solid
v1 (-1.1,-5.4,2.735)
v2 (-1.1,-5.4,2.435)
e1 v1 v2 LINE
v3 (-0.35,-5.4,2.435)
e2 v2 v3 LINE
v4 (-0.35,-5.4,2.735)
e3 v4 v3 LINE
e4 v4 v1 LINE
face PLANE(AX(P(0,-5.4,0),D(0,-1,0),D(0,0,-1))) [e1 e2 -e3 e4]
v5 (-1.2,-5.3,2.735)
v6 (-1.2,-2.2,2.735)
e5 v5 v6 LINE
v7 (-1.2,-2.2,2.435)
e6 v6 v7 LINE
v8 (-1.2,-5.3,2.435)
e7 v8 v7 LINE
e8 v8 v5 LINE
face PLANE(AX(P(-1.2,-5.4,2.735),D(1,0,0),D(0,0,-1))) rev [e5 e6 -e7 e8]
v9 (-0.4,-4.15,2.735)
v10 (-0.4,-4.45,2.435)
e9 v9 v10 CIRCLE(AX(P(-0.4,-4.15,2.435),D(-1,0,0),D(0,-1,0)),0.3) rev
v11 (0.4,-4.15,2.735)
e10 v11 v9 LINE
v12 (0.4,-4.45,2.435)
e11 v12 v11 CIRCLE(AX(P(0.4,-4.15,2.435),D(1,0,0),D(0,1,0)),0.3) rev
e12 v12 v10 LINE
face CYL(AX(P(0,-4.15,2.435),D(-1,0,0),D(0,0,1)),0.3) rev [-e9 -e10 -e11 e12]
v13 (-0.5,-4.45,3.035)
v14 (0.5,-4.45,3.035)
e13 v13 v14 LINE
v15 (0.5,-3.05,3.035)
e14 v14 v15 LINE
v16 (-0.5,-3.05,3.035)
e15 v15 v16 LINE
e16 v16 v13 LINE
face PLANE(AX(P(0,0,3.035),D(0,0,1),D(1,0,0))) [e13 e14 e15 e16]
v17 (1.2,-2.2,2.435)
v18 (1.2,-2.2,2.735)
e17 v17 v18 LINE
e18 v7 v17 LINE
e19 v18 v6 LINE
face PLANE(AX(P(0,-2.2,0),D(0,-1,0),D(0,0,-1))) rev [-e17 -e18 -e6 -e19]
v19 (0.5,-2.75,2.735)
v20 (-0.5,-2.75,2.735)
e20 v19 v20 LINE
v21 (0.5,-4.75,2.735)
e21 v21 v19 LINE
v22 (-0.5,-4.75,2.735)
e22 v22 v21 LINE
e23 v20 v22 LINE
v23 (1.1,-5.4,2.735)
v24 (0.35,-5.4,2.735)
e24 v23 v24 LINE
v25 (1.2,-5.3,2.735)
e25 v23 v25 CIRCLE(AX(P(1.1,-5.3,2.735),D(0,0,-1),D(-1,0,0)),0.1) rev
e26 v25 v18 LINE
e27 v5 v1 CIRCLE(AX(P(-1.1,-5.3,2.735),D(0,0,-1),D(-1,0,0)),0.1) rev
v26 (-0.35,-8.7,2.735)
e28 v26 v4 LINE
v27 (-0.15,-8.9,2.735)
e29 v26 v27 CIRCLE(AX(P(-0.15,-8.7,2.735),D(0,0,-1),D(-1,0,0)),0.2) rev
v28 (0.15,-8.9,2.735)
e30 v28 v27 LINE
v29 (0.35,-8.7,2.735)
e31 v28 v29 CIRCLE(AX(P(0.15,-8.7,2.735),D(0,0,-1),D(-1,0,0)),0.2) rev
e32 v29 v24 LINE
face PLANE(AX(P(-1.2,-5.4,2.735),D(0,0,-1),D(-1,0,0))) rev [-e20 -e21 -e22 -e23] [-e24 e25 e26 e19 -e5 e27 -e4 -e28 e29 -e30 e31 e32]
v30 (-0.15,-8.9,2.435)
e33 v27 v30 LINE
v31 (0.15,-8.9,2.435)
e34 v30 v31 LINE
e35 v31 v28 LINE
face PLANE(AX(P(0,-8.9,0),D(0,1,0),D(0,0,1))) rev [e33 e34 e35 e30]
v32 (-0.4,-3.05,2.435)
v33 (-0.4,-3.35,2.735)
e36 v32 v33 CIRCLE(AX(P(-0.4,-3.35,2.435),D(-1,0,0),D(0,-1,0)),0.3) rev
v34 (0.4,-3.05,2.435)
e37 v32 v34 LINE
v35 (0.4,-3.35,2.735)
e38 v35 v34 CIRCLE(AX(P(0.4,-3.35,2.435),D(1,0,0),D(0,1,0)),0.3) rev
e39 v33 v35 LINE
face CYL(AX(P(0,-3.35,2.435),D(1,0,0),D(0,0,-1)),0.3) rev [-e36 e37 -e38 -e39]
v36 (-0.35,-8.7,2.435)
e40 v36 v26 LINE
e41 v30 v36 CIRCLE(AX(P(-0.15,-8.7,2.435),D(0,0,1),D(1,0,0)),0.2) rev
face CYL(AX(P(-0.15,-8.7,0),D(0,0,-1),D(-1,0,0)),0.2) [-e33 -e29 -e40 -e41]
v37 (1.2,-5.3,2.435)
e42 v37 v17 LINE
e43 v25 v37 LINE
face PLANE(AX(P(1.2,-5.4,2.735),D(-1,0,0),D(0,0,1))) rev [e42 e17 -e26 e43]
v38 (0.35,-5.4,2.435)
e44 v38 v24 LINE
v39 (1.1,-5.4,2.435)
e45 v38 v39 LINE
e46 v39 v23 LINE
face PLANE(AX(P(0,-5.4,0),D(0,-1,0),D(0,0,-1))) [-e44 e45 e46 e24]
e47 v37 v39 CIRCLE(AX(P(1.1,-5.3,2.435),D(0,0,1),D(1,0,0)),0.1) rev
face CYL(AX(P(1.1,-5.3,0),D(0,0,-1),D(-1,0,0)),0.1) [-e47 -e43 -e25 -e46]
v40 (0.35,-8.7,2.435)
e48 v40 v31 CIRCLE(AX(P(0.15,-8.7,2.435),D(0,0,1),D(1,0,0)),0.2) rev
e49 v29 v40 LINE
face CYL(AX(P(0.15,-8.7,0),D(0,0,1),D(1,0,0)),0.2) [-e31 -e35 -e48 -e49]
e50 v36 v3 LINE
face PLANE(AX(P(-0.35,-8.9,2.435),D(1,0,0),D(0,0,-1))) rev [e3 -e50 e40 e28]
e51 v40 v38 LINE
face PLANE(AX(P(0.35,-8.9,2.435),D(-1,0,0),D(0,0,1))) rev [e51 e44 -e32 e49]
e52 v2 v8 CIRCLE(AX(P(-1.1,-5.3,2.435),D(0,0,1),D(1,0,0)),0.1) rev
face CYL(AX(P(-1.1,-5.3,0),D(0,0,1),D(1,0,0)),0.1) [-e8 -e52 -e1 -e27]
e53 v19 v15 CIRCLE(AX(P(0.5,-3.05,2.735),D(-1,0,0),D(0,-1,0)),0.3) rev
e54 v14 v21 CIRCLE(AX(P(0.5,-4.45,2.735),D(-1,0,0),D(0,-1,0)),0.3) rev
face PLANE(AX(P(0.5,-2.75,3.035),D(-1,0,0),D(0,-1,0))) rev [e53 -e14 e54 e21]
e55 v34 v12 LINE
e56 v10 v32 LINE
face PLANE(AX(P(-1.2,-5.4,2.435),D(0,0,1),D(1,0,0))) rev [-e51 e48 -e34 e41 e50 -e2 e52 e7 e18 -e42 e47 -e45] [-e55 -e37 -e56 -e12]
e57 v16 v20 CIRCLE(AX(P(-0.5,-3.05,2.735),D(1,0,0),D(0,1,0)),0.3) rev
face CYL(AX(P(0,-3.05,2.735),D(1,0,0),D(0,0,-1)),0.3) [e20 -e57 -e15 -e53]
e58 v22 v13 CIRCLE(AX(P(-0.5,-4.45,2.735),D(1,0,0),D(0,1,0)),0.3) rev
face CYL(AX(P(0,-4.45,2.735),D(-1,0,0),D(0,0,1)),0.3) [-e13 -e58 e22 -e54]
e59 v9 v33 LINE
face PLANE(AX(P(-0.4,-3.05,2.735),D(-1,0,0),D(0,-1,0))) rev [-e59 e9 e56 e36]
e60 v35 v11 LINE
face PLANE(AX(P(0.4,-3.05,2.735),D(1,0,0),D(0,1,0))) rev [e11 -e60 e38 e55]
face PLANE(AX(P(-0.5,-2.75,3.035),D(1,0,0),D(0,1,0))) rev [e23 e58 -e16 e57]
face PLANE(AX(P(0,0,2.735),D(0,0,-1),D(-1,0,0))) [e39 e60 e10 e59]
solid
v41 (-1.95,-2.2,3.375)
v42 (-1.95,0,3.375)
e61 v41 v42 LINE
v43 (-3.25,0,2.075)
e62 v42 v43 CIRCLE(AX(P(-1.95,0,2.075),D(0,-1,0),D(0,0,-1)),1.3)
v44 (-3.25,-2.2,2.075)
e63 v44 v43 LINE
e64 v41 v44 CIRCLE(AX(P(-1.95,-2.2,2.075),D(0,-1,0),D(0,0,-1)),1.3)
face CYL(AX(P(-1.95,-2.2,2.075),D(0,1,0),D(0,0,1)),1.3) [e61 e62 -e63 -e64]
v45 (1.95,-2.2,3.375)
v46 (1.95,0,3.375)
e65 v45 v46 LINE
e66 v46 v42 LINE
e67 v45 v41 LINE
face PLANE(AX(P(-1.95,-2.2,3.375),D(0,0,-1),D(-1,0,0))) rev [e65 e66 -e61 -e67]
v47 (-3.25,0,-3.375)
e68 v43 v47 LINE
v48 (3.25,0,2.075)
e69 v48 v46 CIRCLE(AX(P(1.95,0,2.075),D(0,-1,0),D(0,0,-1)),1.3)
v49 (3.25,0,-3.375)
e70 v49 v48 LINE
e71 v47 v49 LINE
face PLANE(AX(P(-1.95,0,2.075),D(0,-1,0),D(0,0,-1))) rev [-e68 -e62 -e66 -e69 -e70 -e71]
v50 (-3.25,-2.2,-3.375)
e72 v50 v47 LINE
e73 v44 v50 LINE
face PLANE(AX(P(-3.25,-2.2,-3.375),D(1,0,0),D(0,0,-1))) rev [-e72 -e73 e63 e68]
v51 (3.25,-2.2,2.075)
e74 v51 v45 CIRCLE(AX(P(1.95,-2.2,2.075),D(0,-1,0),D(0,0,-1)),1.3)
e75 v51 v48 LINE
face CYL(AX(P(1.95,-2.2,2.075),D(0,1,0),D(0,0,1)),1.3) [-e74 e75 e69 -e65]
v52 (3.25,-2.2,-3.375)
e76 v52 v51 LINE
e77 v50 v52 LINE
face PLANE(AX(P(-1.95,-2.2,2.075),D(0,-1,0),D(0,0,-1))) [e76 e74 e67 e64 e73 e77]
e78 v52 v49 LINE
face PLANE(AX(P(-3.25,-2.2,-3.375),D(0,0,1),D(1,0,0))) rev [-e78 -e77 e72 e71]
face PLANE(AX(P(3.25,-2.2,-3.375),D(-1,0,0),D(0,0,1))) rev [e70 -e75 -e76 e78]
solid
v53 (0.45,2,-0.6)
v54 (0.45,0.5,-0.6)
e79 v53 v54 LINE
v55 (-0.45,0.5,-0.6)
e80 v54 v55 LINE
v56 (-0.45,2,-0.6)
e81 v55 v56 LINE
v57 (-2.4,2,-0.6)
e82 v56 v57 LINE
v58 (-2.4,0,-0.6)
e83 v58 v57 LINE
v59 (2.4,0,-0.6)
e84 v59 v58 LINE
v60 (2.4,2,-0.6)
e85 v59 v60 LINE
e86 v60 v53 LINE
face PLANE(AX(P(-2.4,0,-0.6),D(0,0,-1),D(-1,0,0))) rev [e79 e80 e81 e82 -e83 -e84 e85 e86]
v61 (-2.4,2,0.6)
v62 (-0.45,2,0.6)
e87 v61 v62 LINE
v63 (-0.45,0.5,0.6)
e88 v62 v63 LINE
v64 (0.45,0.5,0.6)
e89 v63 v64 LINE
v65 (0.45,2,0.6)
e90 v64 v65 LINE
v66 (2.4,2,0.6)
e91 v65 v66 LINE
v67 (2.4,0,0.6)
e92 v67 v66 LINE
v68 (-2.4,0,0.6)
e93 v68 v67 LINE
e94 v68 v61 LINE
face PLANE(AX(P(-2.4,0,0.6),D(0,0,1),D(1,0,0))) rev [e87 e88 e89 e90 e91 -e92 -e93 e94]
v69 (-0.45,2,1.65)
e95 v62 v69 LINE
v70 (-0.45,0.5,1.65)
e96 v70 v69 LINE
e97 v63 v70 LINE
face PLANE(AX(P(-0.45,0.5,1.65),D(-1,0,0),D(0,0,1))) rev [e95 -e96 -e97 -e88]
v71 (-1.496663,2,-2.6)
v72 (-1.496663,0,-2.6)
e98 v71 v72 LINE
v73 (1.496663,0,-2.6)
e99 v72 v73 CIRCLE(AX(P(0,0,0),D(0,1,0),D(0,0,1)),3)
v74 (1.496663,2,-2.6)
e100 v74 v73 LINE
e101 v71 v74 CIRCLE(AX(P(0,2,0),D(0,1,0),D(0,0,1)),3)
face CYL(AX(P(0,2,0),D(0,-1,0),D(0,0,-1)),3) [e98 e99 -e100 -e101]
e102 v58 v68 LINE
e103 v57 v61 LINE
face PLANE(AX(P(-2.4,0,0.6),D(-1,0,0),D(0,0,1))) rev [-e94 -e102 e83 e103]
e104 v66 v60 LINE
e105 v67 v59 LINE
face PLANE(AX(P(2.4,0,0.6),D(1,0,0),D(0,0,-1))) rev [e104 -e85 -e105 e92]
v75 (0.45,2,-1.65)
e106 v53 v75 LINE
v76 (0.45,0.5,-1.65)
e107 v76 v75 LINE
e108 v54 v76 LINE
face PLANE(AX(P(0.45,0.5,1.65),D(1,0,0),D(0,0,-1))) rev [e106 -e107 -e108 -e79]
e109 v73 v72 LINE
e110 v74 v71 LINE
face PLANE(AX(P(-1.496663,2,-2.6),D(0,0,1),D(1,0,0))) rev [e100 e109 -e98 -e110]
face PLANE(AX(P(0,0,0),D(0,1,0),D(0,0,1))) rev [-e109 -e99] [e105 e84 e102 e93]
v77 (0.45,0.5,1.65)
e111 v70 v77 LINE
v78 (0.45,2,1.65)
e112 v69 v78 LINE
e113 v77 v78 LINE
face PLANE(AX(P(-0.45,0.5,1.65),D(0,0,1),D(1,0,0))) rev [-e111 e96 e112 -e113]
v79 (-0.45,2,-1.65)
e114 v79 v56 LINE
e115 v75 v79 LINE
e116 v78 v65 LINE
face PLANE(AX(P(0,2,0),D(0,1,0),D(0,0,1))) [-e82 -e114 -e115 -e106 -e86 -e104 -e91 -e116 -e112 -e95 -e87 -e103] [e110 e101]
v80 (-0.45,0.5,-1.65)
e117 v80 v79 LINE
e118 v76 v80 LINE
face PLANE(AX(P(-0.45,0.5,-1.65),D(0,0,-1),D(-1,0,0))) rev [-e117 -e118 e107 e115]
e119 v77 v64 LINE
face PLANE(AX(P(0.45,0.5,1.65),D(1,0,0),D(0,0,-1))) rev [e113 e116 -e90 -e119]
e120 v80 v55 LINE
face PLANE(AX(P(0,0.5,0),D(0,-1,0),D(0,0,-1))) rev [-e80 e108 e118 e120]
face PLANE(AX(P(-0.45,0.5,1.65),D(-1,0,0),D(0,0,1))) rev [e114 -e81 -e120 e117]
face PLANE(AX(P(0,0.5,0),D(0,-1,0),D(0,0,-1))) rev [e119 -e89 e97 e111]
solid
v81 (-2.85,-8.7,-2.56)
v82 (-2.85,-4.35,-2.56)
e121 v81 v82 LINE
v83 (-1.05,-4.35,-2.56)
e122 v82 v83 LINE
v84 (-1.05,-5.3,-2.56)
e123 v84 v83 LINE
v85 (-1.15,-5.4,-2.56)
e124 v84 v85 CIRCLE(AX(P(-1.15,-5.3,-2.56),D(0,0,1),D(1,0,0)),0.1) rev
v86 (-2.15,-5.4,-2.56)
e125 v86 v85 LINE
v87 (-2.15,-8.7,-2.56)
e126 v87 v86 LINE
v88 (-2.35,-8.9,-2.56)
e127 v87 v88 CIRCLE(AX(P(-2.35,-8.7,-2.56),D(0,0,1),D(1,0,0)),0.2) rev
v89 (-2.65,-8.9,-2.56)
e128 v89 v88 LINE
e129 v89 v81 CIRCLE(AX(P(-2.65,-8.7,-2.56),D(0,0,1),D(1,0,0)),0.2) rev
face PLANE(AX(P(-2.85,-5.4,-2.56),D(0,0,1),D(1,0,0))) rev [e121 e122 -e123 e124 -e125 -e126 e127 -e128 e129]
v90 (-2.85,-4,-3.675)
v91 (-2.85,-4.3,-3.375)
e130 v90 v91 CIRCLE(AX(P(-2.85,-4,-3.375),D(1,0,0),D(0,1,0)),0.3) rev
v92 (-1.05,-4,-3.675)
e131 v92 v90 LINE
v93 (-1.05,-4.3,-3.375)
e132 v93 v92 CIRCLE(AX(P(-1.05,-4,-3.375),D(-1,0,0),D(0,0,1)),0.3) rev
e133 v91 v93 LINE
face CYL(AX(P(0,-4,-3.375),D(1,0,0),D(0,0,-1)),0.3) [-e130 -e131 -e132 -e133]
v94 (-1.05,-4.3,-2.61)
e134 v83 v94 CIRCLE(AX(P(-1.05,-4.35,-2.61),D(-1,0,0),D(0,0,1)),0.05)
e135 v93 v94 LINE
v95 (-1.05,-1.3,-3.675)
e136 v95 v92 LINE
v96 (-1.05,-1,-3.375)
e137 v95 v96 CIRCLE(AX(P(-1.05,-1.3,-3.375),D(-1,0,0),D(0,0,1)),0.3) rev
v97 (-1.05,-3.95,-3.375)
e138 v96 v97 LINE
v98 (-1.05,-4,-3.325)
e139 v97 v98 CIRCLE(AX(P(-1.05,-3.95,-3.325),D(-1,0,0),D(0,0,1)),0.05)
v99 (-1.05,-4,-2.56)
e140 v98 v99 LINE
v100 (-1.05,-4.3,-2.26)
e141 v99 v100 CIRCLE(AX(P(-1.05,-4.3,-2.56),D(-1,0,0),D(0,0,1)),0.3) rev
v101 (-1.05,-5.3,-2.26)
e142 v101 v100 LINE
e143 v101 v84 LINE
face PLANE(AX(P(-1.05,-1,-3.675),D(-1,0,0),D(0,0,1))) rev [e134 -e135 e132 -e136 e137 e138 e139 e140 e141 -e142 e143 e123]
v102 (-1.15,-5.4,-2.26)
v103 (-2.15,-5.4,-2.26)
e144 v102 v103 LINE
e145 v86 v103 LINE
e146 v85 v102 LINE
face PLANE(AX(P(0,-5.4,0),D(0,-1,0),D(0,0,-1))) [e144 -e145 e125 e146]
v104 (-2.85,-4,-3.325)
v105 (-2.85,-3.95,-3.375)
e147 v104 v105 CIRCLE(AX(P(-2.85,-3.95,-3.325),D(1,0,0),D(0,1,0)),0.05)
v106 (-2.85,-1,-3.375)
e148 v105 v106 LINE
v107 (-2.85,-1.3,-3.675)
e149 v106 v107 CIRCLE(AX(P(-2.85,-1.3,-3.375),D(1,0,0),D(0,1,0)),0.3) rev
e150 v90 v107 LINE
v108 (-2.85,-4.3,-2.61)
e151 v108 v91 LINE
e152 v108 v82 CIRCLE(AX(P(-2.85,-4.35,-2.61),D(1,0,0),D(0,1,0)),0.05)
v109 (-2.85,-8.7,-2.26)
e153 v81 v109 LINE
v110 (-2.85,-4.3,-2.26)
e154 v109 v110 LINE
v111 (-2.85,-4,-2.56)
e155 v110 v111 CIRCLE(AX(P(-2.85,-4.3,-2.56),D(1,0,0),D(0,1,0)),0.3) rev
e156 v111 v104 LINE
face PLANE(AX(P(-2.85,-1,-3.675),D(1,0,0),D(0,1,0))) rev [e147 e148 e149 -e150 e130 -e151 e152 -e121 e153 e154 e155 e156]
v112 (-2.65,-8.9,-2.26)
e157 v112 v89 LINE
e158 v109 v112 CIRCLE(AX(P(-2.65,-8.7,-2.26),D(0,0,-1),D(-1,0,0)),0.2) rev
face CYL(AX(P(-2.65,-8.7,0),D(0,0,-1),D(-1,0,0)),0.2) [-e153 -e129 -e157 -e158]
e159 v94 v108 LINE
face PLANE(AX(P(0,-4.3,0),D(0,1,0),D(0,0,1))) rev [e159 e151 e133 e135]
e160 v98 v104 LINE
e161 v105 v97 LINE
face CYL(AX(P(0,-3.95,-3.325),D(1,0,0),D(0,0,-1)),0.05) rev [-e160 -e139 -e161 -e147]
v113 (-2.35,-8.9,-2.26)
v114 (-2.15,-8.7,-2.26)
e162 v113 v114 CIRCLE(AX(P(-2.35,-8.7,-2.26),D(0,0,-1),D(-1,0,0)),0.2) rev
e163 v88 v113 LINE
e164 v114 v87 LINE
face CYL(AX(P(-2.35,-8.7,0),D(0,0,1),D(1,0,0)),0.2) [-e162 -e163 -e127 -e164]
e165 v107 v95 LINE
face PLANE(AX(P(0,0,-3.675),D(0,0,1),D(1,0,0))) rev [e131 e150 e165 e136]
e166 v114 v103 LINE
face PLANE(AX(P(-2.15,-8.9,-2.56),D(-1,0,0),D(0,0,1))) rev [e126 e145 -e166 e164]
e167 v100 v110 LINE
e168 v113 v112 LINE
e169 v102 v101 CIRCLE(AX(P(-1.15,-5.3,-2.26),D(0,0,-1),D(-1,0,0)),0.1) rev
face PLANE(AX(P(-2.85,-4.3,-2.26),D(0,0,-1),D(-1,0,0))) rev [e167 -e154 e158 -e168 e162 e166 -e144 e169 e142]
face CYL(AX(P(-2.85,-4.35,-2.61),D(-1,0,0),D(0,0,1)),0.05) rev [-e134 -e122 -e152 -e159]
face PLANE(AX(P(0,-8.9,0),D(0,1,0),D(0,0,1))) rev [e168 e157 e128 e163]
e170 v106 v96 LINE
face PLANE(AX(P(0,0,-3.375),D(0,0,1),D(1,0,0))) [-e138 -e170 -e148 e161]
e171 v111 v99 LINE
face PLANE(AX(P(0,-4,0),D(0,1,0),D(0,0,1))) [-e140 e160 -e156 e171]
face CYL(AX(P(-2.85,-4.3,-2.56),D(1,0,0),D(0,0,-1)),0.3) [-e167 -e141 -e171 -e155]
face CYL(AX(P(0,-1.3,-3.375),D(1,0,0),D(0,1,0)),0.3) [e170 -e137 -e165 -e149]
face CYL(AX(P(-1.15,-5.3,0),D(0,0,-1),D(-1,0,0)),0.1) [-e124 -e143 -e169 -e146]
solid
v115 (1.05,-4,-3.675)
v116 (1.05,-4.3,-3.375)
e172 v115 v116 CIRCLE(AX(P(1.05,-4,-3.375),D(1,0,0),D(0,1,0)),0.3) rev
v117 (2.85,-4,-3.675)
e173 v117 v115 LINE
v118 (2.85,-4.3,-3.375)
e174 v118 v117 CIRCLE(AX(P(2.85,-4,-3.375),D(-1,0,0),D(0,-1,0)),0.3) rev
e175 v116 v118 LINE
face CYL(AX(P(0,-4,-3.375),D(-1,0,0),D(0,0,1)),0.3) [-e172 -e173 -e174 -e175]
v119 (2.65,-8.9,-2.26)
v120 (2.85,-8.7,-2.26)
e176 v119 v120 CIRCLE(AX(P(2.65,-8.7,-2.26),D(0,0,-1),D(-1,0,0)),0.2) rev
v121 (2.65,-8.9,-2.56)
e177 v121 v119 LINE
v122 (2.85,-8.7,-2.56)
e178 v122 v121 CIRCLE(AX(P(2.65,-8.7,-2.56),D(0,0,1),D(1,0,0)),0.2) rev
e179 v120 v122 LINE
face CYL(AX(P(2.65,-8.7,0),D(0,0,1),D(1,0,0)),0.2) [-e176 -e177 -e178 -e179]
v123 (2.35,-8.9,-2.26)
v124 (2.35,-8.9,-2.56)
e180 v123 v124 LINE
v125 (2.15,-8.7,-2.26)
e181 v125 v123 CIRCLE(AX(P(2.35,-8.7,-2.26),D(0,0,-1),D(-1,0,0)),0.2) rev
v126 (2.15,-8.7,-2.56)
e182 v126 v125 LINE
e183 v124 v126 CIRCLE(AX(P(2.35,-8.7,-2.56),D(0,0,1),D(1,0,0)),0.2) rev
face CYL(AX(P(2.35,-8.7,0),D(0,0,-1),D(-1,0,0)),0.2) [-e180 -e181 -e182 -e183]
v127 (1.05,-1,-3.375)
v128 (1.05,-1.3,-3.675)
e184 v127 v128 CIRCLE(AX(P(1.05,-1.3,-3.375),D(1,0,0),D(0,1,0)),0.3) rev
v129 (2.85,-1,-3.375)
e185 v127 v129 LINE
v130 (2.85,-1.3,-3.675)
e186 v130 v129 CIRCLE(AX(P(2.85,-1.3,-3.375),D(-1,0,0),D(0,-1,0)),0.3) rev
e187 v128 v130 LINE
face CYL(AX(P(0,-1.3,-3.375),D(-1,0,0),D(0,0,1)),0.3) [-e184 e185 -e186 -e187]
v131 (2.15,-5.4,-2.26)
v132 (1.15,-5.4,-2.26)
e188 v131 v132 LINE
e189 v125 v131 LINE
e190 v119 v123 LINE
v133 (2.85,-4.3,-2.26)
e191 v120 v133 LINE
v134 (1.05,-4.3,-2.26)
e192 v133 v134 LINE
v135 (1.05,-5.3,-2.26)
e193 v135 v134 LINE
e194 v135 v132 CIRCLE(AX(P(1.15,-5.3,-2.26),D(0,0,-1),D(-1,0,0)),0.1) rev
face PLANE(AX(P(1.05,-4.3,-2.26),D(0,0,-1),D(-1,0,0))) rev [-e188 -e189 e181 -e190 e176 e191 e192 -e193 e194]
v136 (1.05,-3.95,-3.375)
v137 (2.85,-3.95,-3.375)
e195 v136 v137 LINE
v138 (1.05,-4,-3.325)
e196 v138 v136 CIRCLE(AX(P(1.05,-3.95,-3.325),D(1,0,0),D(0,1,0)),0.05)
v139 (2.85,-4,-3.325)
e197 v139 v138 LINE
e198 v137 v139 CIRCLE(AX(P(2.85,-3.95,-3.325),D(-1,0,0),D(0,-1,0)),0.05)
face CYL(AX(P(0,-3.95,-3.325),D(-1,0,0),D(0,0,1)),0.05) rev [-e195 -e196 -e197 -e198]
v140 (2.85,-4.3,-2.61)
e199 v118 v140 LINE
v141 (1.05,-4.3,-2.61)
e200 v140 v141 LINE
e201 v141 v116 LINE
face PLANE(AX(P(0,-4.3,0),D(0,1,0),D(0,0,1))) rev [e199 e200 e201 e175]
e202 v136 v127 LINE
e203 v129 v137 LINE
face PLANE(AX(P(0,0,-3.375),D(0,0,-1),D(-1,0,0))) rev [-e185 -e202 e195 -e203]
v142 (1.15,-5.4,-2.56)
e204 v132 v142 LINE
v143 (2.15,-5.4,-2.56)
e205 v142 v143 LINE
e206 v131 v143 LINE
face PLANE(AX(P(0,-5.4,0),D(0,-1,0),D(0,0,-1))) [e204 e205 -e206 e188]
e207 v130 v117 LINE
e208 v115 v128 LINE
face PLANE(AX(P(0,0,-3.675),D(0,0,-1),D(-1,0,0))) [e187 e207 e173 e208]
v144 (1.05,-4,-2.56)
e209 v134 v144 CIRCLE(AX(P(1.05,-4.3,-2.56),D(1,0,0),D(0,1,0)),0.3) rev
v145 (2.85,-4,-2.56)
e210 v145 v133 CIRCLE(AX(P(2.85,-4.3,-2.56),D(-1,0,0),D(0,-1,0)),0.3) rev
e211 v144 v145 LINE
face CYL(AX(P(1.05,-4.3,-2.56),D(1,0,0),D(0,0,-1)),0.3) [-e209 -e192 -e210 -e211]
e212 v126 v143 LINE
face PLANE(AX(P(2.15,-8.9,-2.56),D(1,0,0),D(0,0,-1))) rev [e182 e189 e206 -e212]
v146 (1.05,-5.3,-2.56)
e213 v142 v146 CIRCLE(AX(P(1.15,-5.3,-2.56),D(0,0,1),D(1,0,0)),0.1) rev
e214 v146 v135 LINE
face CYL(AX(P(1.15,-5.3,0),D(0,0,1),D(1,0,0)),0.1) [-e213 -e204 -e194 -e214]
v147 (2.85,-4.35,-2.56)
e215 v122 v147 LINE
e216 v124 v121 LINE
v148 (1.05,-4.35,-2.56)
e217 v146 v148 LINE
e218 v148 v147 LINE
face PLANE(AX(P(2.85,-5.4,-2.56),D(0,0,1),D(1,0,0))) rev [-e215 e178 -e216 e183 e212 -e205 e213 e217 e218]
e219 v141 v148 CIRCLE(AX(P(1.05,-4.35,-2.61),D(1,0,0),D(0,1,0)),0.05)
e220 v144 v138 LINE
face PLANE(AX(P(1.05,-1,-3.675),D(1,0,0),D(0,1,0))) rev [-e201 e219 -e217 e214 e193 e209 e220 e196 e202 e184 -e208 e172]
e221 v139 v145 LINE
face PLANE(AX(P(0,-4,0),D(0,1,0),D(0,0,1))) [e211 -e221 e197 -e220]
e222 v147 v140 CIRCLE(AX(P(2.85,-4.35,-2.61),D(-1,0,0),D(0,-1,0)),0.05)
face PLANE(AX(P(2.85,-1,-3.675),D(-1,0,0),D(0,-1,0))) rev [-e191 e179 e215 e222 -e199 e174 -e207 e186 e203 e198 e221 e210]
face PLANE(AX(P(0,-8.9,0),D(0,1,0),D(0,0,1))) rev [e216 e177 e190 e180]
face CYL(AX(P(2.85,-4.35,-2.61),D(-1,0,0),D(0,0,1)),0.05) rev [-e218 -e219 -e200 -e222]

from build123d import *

# Parameters (mm, degrees)
BOSS_EXTRUDE1_DEPTH   = 2
SKETCH2_W             = 4.8
SKETCH2_H             = 1.2
CUT_EXTRUDE1_DEPTH    = 5.69041576
SKETCH3_W             = 0.9
SKETCH3_H             = 3.3
CUT_EXTRUDE2_DEPTH    = 1.5
BOSS_EXTRUDE2_DEPTH   = 2.2
SKETCH5_W             = 2.4
SKETCH5_H             = 0.3
BOSS_EXTRUDE3_DEPTH   = 3.2
SKETCH6_W             = 0.7
SKETCH6_H             = 0.3
BOSS_EXTRUDE4_DEPTH   = 3.5
FILLET1_R             = 0.1
FILLET2_R             = 0.2
SKETCH8_W             = 1
SKETCH8_H             = 2
BOSS_EXTRUDE5_DEPTH   = 0.3
FILLET3_R             = 0.3
SKETCH16_W            = 0.8
SKETCH16_H            = 1.4
CUT_EXTRUDE5_DEPTH    = 0.3
FILLET18_R            = 0.3
SKETCH9_W             = 1.8
SKETCH9_H             = 3
BOSS_EXTRUDE6_DEPTH   = 0.3
BOSS_EXTRUDE6_2_DEPTH = 0.3
FILLET4_R             = 0.3
FILLET5_R             = 0.3
SKETCH10_W            = 1.8
SKETCH10_H            = 1.415
BOSS_EXTRUDE7_DEPTH   = 0.3
FILLET6_R             = 0.3
FILLET7_R             = 0.3
FILLET8_R             = 0.05
FILLET9_R             = 0.05
SKETCH11_W            = 1.8
SKETCH11_H            = 0.3
BOSS_EXTRUDE8_DEPTH   = 1.1
FILLET10_R            = 0.3
FILLET11_R            = 0.3
FILLET12_R            = 0.05
FILLET13_R            = 0.05
SKETCH13_W            = 0.7
SKETCH13_H            = 0.3
BOSS_EXTRUDE9_DEPTH   = 3.5
FILLET14_R            = 0.2
SKETCH15_W            = 0.7
SKETCH15_H            = 0.3
BOSS_EXTRUDE10_DEPTH  = 3.5
FILLET15_R            = 0.2
FILLET16_R            = 0.1
FILLET17_R            = 0.1


with BuildPart() as part:
    # Sketch1 → Boss-Extrude1 (new body)
    with BuildSketch(Plane(origin=(0, 0, 0), x_dir=(1, 0, 0), z_dir=(0, 1, 0))):
        with BuildLine():
            Line((-1.496662955, 2.6), (1.496662955, 2.6))
            ThreePointArc((1.496662955, 2.6), (0, -3), (-1.496662955, 2.6))
        make_face()
    extrude(amount=BOSS_EXTRUDE1_DEPTH)

    # Sketch2 → Cut-Extrude1 (cut, through all)
    with BuildSketch(Plane(origin=(0, 2, 0), x_dir=(1, 0, 0), z_dir=(0, 1, 0))):
        Rectangle(SKETCH2_W, SKETCH2_H)
    extrude(amount=-CUT_EXTRUDE1_DEPTH, mode=Mode.SUBTRACT)

    # Sketch3 → Cut-Extrude2 (cut)
    with BuildSketch(Plane(origin=(0, 2, 0), x_dir=(1, 0, 0), z_dir=(0, 1, 0))):
        Rectangle(SKETCH3_W, SKETCH3_H)
    extrude(amount=-CUT_EXTRUDE2_DEPTH, mode=Mode.SUBTRACT)


with BuildPart() as body_2:
    # Sketch4 → Boss-Extrude2 (new body)
    with BuildSketch(Plane.XZ):
        with BuildLine():
            Line((-3.25, -3.375), (3.25, -3.375))
            Line((3.25, -3.375), (3.25, 2.075))
            ThreePointArc((3.25, 2.075), (2.869238816, 2.994238816), (1.95, 3.375))
            Line((1.95, 3.375), (-1.95, 3.375))
            ThreePointArc((-1.95, 3.375), (-2.869238816, 2.994238816), (-3.25, 2.075))
            Line((-3.25, 2.075), (-3.25, -3.375))
        make_face()
    extrude(amount=BOSS_EXTRUDE2_DEPTH)


with BuildPart() as body_3:
    # Sketch5 → Boss-Extrude3 (new body)
    with BuildSketch(Plane.XZ.offset(2.2)):
        with Locations((0, 2.585)):
            Rectangle(SKETCH5_W, SKETCH5_H)
    extrude(amount=BOSS_EXTRUDE3_DEPTH)

    # Sketch6 → Boss-Extrude4 (add)
    with BuildSketch(Plane.XZ.offset(5.4)):
        with Locations((0, 2.585)):
            Rectangle(SKETCH6_W, SKETCH6_H)
    extrude(amount=BOSS_EXTRUDE4_DEPTH)

    # Fillet1
    fillet1_edges = [body_3.edges().sort_by_distance(p)[0] for p in [
        (-1.2, -5.4, 2.585),
        (1.2, -5.4, 2.585),
    ]]
    fillet(fillet1_edges, radius=FILLET1_R)

    # Fillet2
    fillet2_edges = [body_3.edges().sort_by_distance(p)[0] for p in [
        (0.35, -8.9, 2.585),
        (-0.35, -8.9, 2.585),
    ]]
    fillet(fillet2_edges, radius=FILLET2_R)

    # Sketch8 → Boss-Extrude5 (add)
    with BuildSketch(Plane.XY.offset(2.735)):
        with Locations((0, -3.75)):
            Rectangle(SKETCH8_W, SKETCH8_H)
    extrude(amount=BOSS_EXTRUDE5_DEPTH)

    # Fillet3
    fillet3_edges = [body_3.edges().sort_by_distance(p)[0] for p in [
        (0, -4.75, 3.035),
        (0, -2.75, 3.035),
    ]]
    fillet(fillet3_edges, radius=FILLET3_R - 0.0001)  # a hair under: the kernel refuses the full size

    # Sketch16 → Cut-Extrude5 (cut)
    with BuildSketch(Plane(origin=(0, 0, 2.435), x_dir=(-1, 0, 0), z_dir=(0, 0, -1))):
        with Locations((0, -3.75)):
            Rectangle(SKETCH16_W, SKETCH16_H)
    extrude(amount=-CUT_EXTRUDE5_DEPTH, mode=Mode.SUBTRACT)

    # Fillet18
    fillet18_edges = [body_3.edges().sort_by_distance(p)[0] for p in [
        (0, -3.05, 2.735),
        (0, -4.45, 2.735),
    ]]
    fillet(fillet18_edges, radius=FILLET18_R - 0.0001)  # a hair under: the kernel refuses the full size


with BuildPart() as body_4:
    # Sketch9 → Boss-Extrude6 (new body)
    with BuildSketch(Plane(origin=(0, 0, -3.375), x_dir=(-1, 0, 0), z_dir=(0, 0, -1))):
        with Locations((-1.95, -2.5)):
            Rectangle(SKETCH9_W, SKETCH9_H)
    extrude(amount=BOSS_EXTRUDE6_DEPTH)

    # Fillet4
    fillet4_edges = [body_4.edges().sort_by_distance(p)[0] for p in [
        (1.95, -1, -3.675),
    ]]
    fillet(fillet4_edges, radius=FILLET4_R - 0.0001)  # a hair under: the kernel refuses the full size



with BuildPart() as body_5:
    # Sketch9 → Boss-Extrude6 2 (new body)
    with BuildSketch(Plane(origin=(0, 0, -3.375), x_dir=(-1, 0, 0), z_dir=(0, 0, -1))):
        with Locations((1.95, -2.5)):
            Rectangle(SKETCH9_W, SKETCH9_H)
    extrude(amount=BOSS_EXTRUDE6_2_DEPTH)

    # Fillet5
    fillet5_edges = [body_5.edges().sort_by_distance(p)[0] for p in [
        (-1.95, -1, -3.675),
    ]]
    fillet(fillet5_edges, radius=FILLET5_R - 0.0001)  # a hair under: the kernel refuses the full size


with BuildPart() as body_4_1:
    add(body_4.part)

    add(body_5.part)  # Boss-Extrude7 merges body 5
    # Sketch10 → Boss-Extrude7 (add)
    with BuildSketch(Plane.XZ.offset(4)):
        with Locations((-1.95, -2.9675)):
            Rectangle(SKETCH10_W, SKETCH10_H)
        with Locations((1.95, -2.9675)):
            Rectangle(SKETCH10_W, SKETCH10_H)
    extrude(amount=BOSS_EXTRUDE7_DEPTH)

    # Fillet6
    fillet6_edges = [body_4_1.edges().sort_by_distance(p)[0] for p in [
        (-1.95, -4.3, -3.675),
    ]]
    fillet(fillet6_edges, radius=FILLET6_R)

    # Fillet7
    fillet7_edges = [body_4_1.edges().sort_by_distance(p)[0] for p in [
        (1.95, -4.3, -3.675),
    ]]
    fillet(fillet7_edges, radius=FILLET7_R)

    # Fillet8
    fillet8_edges = [body_4_1.edges().sort_by_distance(p)[0] for p in [
        (1.95, -4, -3.375),
    ]]
    fillet(fillet8_edges, radius=FILLET8_R)

    # Fillet9
    fillet9_edges = [body_4_1.edges().sort_by_distance(p)[0] for p in [
        (-1.95, -4, -3.375),
    ]]
    fillet(fillet9_edges, radius=FILLET9_R)

    # Sketch11 → Boss-Extrude8 (add)
    with BuildSketch(Plane.XZ.offset(4.3)):
        with Locations((-1.95, -2.41)):
            Rectangle(SKETCH11_W, SKETCH11_H)
        with Locations((1.95, -2.41)):
            Rectangle(SKETCH11_W, SKETCH11_H)
    extrude(amount=BOSS_EXTRUDE8_DEPTH)

    # Fillet10
    fillet10_edges = [body_4_1.edges().sort_by_distance(p)[0] for p in [
        (-1.95, -4, -2.26),
    ]]
    fillet(fillet10_edges, radius=FILLET10_R)

    # Fillet11
    fillet11_edges = [body_4_1.edges().sort_by_distance(p)[0] for p in [
        (1.95, -4, -2.26),
    ]]
    fillet(fillet11_edges, radius=FILLET11_R)

    # Fillet12
    fillet12_edges = [body_4_1.edges().sort_by_distance(p)[0] for p in [
        (1.95, -4.3, -2.56),
    ]]
    fillet(fillet12_edges, radius=FILLET12_R)

    # Fillet13
    fillet13_edges = [body_4_1.edges().sort_by_distance(p)[0] for p in [
        (-1.95, -4.3, -2.56),
    ]]
    fillet(fillet13_edges, radius=FILLET13_R)

    # Sketch13 → Boss-Extrude9 (add)
    with BuildSketch(Plane(origin=(2.120815784, -5.4, -5.846545424), x_dir=(1, 0, 0), z_dir=(0, -1, 0))):
        with Locations((0.379184216, 3.436545424)):
            Rectangle(SKETCH13_W, SKETCH13_H)
    extrude(amount=BOSS_EXTRUDE9_DEPTH)

    # Fillet14
    fillet14_edges = [body_4_1.edges().sort_by_distance(p)[0] for p in [
        (2.85, -8.9, -2.41),
        (2.15, -8.9, -2.41),
    ]]
    fillet(fillet14_edges, radius=FILLET14_R)

    # Sketch15 → Boss-Extrude10 (add)
    with BuildSketch(Plane(origin=(-2.261414386, -5.4, -5.820113932), x_dir=(1, 0, 0), z_dir=(0, -1, 0))):
        with Locations((-0.238585614, 3.410113932)):
            Rectangle(SKETCH15_W, SKETCH15_H)
    extrude(amount=BOSS_EXTRUDE10_DEPTH)

    # Fillet15
    fillet15_edges = [body_4_1.edges().sort_by_distance(p)[0] for p in [
        (-2.15, -8.9, -2.41),
        (-2.85, -8.9, -2.41),
    ]]
    fillet(fillet15_edges, radius=FILLET15_R)

    # Fillet16
    fillet16_edges = [body_4_1.edges().sort_by_distance(p)[0] for p in [
        (1.05, -5.4, -2.41),
    ]]
    fillet(fillet16_edges, radius=FILLET16_R)

    # Fillet17
    fillet17_edges = [body_4_1.edges().sort_by_distance(p)[0] for p in [
        (-1.05, -5.4, -2.41),
    ]]
    fillet(fillet17_edges, radius=FILLET17_R)


solid = Compound([part.part, body_2.part, body_3.part, body_4_1.part])
